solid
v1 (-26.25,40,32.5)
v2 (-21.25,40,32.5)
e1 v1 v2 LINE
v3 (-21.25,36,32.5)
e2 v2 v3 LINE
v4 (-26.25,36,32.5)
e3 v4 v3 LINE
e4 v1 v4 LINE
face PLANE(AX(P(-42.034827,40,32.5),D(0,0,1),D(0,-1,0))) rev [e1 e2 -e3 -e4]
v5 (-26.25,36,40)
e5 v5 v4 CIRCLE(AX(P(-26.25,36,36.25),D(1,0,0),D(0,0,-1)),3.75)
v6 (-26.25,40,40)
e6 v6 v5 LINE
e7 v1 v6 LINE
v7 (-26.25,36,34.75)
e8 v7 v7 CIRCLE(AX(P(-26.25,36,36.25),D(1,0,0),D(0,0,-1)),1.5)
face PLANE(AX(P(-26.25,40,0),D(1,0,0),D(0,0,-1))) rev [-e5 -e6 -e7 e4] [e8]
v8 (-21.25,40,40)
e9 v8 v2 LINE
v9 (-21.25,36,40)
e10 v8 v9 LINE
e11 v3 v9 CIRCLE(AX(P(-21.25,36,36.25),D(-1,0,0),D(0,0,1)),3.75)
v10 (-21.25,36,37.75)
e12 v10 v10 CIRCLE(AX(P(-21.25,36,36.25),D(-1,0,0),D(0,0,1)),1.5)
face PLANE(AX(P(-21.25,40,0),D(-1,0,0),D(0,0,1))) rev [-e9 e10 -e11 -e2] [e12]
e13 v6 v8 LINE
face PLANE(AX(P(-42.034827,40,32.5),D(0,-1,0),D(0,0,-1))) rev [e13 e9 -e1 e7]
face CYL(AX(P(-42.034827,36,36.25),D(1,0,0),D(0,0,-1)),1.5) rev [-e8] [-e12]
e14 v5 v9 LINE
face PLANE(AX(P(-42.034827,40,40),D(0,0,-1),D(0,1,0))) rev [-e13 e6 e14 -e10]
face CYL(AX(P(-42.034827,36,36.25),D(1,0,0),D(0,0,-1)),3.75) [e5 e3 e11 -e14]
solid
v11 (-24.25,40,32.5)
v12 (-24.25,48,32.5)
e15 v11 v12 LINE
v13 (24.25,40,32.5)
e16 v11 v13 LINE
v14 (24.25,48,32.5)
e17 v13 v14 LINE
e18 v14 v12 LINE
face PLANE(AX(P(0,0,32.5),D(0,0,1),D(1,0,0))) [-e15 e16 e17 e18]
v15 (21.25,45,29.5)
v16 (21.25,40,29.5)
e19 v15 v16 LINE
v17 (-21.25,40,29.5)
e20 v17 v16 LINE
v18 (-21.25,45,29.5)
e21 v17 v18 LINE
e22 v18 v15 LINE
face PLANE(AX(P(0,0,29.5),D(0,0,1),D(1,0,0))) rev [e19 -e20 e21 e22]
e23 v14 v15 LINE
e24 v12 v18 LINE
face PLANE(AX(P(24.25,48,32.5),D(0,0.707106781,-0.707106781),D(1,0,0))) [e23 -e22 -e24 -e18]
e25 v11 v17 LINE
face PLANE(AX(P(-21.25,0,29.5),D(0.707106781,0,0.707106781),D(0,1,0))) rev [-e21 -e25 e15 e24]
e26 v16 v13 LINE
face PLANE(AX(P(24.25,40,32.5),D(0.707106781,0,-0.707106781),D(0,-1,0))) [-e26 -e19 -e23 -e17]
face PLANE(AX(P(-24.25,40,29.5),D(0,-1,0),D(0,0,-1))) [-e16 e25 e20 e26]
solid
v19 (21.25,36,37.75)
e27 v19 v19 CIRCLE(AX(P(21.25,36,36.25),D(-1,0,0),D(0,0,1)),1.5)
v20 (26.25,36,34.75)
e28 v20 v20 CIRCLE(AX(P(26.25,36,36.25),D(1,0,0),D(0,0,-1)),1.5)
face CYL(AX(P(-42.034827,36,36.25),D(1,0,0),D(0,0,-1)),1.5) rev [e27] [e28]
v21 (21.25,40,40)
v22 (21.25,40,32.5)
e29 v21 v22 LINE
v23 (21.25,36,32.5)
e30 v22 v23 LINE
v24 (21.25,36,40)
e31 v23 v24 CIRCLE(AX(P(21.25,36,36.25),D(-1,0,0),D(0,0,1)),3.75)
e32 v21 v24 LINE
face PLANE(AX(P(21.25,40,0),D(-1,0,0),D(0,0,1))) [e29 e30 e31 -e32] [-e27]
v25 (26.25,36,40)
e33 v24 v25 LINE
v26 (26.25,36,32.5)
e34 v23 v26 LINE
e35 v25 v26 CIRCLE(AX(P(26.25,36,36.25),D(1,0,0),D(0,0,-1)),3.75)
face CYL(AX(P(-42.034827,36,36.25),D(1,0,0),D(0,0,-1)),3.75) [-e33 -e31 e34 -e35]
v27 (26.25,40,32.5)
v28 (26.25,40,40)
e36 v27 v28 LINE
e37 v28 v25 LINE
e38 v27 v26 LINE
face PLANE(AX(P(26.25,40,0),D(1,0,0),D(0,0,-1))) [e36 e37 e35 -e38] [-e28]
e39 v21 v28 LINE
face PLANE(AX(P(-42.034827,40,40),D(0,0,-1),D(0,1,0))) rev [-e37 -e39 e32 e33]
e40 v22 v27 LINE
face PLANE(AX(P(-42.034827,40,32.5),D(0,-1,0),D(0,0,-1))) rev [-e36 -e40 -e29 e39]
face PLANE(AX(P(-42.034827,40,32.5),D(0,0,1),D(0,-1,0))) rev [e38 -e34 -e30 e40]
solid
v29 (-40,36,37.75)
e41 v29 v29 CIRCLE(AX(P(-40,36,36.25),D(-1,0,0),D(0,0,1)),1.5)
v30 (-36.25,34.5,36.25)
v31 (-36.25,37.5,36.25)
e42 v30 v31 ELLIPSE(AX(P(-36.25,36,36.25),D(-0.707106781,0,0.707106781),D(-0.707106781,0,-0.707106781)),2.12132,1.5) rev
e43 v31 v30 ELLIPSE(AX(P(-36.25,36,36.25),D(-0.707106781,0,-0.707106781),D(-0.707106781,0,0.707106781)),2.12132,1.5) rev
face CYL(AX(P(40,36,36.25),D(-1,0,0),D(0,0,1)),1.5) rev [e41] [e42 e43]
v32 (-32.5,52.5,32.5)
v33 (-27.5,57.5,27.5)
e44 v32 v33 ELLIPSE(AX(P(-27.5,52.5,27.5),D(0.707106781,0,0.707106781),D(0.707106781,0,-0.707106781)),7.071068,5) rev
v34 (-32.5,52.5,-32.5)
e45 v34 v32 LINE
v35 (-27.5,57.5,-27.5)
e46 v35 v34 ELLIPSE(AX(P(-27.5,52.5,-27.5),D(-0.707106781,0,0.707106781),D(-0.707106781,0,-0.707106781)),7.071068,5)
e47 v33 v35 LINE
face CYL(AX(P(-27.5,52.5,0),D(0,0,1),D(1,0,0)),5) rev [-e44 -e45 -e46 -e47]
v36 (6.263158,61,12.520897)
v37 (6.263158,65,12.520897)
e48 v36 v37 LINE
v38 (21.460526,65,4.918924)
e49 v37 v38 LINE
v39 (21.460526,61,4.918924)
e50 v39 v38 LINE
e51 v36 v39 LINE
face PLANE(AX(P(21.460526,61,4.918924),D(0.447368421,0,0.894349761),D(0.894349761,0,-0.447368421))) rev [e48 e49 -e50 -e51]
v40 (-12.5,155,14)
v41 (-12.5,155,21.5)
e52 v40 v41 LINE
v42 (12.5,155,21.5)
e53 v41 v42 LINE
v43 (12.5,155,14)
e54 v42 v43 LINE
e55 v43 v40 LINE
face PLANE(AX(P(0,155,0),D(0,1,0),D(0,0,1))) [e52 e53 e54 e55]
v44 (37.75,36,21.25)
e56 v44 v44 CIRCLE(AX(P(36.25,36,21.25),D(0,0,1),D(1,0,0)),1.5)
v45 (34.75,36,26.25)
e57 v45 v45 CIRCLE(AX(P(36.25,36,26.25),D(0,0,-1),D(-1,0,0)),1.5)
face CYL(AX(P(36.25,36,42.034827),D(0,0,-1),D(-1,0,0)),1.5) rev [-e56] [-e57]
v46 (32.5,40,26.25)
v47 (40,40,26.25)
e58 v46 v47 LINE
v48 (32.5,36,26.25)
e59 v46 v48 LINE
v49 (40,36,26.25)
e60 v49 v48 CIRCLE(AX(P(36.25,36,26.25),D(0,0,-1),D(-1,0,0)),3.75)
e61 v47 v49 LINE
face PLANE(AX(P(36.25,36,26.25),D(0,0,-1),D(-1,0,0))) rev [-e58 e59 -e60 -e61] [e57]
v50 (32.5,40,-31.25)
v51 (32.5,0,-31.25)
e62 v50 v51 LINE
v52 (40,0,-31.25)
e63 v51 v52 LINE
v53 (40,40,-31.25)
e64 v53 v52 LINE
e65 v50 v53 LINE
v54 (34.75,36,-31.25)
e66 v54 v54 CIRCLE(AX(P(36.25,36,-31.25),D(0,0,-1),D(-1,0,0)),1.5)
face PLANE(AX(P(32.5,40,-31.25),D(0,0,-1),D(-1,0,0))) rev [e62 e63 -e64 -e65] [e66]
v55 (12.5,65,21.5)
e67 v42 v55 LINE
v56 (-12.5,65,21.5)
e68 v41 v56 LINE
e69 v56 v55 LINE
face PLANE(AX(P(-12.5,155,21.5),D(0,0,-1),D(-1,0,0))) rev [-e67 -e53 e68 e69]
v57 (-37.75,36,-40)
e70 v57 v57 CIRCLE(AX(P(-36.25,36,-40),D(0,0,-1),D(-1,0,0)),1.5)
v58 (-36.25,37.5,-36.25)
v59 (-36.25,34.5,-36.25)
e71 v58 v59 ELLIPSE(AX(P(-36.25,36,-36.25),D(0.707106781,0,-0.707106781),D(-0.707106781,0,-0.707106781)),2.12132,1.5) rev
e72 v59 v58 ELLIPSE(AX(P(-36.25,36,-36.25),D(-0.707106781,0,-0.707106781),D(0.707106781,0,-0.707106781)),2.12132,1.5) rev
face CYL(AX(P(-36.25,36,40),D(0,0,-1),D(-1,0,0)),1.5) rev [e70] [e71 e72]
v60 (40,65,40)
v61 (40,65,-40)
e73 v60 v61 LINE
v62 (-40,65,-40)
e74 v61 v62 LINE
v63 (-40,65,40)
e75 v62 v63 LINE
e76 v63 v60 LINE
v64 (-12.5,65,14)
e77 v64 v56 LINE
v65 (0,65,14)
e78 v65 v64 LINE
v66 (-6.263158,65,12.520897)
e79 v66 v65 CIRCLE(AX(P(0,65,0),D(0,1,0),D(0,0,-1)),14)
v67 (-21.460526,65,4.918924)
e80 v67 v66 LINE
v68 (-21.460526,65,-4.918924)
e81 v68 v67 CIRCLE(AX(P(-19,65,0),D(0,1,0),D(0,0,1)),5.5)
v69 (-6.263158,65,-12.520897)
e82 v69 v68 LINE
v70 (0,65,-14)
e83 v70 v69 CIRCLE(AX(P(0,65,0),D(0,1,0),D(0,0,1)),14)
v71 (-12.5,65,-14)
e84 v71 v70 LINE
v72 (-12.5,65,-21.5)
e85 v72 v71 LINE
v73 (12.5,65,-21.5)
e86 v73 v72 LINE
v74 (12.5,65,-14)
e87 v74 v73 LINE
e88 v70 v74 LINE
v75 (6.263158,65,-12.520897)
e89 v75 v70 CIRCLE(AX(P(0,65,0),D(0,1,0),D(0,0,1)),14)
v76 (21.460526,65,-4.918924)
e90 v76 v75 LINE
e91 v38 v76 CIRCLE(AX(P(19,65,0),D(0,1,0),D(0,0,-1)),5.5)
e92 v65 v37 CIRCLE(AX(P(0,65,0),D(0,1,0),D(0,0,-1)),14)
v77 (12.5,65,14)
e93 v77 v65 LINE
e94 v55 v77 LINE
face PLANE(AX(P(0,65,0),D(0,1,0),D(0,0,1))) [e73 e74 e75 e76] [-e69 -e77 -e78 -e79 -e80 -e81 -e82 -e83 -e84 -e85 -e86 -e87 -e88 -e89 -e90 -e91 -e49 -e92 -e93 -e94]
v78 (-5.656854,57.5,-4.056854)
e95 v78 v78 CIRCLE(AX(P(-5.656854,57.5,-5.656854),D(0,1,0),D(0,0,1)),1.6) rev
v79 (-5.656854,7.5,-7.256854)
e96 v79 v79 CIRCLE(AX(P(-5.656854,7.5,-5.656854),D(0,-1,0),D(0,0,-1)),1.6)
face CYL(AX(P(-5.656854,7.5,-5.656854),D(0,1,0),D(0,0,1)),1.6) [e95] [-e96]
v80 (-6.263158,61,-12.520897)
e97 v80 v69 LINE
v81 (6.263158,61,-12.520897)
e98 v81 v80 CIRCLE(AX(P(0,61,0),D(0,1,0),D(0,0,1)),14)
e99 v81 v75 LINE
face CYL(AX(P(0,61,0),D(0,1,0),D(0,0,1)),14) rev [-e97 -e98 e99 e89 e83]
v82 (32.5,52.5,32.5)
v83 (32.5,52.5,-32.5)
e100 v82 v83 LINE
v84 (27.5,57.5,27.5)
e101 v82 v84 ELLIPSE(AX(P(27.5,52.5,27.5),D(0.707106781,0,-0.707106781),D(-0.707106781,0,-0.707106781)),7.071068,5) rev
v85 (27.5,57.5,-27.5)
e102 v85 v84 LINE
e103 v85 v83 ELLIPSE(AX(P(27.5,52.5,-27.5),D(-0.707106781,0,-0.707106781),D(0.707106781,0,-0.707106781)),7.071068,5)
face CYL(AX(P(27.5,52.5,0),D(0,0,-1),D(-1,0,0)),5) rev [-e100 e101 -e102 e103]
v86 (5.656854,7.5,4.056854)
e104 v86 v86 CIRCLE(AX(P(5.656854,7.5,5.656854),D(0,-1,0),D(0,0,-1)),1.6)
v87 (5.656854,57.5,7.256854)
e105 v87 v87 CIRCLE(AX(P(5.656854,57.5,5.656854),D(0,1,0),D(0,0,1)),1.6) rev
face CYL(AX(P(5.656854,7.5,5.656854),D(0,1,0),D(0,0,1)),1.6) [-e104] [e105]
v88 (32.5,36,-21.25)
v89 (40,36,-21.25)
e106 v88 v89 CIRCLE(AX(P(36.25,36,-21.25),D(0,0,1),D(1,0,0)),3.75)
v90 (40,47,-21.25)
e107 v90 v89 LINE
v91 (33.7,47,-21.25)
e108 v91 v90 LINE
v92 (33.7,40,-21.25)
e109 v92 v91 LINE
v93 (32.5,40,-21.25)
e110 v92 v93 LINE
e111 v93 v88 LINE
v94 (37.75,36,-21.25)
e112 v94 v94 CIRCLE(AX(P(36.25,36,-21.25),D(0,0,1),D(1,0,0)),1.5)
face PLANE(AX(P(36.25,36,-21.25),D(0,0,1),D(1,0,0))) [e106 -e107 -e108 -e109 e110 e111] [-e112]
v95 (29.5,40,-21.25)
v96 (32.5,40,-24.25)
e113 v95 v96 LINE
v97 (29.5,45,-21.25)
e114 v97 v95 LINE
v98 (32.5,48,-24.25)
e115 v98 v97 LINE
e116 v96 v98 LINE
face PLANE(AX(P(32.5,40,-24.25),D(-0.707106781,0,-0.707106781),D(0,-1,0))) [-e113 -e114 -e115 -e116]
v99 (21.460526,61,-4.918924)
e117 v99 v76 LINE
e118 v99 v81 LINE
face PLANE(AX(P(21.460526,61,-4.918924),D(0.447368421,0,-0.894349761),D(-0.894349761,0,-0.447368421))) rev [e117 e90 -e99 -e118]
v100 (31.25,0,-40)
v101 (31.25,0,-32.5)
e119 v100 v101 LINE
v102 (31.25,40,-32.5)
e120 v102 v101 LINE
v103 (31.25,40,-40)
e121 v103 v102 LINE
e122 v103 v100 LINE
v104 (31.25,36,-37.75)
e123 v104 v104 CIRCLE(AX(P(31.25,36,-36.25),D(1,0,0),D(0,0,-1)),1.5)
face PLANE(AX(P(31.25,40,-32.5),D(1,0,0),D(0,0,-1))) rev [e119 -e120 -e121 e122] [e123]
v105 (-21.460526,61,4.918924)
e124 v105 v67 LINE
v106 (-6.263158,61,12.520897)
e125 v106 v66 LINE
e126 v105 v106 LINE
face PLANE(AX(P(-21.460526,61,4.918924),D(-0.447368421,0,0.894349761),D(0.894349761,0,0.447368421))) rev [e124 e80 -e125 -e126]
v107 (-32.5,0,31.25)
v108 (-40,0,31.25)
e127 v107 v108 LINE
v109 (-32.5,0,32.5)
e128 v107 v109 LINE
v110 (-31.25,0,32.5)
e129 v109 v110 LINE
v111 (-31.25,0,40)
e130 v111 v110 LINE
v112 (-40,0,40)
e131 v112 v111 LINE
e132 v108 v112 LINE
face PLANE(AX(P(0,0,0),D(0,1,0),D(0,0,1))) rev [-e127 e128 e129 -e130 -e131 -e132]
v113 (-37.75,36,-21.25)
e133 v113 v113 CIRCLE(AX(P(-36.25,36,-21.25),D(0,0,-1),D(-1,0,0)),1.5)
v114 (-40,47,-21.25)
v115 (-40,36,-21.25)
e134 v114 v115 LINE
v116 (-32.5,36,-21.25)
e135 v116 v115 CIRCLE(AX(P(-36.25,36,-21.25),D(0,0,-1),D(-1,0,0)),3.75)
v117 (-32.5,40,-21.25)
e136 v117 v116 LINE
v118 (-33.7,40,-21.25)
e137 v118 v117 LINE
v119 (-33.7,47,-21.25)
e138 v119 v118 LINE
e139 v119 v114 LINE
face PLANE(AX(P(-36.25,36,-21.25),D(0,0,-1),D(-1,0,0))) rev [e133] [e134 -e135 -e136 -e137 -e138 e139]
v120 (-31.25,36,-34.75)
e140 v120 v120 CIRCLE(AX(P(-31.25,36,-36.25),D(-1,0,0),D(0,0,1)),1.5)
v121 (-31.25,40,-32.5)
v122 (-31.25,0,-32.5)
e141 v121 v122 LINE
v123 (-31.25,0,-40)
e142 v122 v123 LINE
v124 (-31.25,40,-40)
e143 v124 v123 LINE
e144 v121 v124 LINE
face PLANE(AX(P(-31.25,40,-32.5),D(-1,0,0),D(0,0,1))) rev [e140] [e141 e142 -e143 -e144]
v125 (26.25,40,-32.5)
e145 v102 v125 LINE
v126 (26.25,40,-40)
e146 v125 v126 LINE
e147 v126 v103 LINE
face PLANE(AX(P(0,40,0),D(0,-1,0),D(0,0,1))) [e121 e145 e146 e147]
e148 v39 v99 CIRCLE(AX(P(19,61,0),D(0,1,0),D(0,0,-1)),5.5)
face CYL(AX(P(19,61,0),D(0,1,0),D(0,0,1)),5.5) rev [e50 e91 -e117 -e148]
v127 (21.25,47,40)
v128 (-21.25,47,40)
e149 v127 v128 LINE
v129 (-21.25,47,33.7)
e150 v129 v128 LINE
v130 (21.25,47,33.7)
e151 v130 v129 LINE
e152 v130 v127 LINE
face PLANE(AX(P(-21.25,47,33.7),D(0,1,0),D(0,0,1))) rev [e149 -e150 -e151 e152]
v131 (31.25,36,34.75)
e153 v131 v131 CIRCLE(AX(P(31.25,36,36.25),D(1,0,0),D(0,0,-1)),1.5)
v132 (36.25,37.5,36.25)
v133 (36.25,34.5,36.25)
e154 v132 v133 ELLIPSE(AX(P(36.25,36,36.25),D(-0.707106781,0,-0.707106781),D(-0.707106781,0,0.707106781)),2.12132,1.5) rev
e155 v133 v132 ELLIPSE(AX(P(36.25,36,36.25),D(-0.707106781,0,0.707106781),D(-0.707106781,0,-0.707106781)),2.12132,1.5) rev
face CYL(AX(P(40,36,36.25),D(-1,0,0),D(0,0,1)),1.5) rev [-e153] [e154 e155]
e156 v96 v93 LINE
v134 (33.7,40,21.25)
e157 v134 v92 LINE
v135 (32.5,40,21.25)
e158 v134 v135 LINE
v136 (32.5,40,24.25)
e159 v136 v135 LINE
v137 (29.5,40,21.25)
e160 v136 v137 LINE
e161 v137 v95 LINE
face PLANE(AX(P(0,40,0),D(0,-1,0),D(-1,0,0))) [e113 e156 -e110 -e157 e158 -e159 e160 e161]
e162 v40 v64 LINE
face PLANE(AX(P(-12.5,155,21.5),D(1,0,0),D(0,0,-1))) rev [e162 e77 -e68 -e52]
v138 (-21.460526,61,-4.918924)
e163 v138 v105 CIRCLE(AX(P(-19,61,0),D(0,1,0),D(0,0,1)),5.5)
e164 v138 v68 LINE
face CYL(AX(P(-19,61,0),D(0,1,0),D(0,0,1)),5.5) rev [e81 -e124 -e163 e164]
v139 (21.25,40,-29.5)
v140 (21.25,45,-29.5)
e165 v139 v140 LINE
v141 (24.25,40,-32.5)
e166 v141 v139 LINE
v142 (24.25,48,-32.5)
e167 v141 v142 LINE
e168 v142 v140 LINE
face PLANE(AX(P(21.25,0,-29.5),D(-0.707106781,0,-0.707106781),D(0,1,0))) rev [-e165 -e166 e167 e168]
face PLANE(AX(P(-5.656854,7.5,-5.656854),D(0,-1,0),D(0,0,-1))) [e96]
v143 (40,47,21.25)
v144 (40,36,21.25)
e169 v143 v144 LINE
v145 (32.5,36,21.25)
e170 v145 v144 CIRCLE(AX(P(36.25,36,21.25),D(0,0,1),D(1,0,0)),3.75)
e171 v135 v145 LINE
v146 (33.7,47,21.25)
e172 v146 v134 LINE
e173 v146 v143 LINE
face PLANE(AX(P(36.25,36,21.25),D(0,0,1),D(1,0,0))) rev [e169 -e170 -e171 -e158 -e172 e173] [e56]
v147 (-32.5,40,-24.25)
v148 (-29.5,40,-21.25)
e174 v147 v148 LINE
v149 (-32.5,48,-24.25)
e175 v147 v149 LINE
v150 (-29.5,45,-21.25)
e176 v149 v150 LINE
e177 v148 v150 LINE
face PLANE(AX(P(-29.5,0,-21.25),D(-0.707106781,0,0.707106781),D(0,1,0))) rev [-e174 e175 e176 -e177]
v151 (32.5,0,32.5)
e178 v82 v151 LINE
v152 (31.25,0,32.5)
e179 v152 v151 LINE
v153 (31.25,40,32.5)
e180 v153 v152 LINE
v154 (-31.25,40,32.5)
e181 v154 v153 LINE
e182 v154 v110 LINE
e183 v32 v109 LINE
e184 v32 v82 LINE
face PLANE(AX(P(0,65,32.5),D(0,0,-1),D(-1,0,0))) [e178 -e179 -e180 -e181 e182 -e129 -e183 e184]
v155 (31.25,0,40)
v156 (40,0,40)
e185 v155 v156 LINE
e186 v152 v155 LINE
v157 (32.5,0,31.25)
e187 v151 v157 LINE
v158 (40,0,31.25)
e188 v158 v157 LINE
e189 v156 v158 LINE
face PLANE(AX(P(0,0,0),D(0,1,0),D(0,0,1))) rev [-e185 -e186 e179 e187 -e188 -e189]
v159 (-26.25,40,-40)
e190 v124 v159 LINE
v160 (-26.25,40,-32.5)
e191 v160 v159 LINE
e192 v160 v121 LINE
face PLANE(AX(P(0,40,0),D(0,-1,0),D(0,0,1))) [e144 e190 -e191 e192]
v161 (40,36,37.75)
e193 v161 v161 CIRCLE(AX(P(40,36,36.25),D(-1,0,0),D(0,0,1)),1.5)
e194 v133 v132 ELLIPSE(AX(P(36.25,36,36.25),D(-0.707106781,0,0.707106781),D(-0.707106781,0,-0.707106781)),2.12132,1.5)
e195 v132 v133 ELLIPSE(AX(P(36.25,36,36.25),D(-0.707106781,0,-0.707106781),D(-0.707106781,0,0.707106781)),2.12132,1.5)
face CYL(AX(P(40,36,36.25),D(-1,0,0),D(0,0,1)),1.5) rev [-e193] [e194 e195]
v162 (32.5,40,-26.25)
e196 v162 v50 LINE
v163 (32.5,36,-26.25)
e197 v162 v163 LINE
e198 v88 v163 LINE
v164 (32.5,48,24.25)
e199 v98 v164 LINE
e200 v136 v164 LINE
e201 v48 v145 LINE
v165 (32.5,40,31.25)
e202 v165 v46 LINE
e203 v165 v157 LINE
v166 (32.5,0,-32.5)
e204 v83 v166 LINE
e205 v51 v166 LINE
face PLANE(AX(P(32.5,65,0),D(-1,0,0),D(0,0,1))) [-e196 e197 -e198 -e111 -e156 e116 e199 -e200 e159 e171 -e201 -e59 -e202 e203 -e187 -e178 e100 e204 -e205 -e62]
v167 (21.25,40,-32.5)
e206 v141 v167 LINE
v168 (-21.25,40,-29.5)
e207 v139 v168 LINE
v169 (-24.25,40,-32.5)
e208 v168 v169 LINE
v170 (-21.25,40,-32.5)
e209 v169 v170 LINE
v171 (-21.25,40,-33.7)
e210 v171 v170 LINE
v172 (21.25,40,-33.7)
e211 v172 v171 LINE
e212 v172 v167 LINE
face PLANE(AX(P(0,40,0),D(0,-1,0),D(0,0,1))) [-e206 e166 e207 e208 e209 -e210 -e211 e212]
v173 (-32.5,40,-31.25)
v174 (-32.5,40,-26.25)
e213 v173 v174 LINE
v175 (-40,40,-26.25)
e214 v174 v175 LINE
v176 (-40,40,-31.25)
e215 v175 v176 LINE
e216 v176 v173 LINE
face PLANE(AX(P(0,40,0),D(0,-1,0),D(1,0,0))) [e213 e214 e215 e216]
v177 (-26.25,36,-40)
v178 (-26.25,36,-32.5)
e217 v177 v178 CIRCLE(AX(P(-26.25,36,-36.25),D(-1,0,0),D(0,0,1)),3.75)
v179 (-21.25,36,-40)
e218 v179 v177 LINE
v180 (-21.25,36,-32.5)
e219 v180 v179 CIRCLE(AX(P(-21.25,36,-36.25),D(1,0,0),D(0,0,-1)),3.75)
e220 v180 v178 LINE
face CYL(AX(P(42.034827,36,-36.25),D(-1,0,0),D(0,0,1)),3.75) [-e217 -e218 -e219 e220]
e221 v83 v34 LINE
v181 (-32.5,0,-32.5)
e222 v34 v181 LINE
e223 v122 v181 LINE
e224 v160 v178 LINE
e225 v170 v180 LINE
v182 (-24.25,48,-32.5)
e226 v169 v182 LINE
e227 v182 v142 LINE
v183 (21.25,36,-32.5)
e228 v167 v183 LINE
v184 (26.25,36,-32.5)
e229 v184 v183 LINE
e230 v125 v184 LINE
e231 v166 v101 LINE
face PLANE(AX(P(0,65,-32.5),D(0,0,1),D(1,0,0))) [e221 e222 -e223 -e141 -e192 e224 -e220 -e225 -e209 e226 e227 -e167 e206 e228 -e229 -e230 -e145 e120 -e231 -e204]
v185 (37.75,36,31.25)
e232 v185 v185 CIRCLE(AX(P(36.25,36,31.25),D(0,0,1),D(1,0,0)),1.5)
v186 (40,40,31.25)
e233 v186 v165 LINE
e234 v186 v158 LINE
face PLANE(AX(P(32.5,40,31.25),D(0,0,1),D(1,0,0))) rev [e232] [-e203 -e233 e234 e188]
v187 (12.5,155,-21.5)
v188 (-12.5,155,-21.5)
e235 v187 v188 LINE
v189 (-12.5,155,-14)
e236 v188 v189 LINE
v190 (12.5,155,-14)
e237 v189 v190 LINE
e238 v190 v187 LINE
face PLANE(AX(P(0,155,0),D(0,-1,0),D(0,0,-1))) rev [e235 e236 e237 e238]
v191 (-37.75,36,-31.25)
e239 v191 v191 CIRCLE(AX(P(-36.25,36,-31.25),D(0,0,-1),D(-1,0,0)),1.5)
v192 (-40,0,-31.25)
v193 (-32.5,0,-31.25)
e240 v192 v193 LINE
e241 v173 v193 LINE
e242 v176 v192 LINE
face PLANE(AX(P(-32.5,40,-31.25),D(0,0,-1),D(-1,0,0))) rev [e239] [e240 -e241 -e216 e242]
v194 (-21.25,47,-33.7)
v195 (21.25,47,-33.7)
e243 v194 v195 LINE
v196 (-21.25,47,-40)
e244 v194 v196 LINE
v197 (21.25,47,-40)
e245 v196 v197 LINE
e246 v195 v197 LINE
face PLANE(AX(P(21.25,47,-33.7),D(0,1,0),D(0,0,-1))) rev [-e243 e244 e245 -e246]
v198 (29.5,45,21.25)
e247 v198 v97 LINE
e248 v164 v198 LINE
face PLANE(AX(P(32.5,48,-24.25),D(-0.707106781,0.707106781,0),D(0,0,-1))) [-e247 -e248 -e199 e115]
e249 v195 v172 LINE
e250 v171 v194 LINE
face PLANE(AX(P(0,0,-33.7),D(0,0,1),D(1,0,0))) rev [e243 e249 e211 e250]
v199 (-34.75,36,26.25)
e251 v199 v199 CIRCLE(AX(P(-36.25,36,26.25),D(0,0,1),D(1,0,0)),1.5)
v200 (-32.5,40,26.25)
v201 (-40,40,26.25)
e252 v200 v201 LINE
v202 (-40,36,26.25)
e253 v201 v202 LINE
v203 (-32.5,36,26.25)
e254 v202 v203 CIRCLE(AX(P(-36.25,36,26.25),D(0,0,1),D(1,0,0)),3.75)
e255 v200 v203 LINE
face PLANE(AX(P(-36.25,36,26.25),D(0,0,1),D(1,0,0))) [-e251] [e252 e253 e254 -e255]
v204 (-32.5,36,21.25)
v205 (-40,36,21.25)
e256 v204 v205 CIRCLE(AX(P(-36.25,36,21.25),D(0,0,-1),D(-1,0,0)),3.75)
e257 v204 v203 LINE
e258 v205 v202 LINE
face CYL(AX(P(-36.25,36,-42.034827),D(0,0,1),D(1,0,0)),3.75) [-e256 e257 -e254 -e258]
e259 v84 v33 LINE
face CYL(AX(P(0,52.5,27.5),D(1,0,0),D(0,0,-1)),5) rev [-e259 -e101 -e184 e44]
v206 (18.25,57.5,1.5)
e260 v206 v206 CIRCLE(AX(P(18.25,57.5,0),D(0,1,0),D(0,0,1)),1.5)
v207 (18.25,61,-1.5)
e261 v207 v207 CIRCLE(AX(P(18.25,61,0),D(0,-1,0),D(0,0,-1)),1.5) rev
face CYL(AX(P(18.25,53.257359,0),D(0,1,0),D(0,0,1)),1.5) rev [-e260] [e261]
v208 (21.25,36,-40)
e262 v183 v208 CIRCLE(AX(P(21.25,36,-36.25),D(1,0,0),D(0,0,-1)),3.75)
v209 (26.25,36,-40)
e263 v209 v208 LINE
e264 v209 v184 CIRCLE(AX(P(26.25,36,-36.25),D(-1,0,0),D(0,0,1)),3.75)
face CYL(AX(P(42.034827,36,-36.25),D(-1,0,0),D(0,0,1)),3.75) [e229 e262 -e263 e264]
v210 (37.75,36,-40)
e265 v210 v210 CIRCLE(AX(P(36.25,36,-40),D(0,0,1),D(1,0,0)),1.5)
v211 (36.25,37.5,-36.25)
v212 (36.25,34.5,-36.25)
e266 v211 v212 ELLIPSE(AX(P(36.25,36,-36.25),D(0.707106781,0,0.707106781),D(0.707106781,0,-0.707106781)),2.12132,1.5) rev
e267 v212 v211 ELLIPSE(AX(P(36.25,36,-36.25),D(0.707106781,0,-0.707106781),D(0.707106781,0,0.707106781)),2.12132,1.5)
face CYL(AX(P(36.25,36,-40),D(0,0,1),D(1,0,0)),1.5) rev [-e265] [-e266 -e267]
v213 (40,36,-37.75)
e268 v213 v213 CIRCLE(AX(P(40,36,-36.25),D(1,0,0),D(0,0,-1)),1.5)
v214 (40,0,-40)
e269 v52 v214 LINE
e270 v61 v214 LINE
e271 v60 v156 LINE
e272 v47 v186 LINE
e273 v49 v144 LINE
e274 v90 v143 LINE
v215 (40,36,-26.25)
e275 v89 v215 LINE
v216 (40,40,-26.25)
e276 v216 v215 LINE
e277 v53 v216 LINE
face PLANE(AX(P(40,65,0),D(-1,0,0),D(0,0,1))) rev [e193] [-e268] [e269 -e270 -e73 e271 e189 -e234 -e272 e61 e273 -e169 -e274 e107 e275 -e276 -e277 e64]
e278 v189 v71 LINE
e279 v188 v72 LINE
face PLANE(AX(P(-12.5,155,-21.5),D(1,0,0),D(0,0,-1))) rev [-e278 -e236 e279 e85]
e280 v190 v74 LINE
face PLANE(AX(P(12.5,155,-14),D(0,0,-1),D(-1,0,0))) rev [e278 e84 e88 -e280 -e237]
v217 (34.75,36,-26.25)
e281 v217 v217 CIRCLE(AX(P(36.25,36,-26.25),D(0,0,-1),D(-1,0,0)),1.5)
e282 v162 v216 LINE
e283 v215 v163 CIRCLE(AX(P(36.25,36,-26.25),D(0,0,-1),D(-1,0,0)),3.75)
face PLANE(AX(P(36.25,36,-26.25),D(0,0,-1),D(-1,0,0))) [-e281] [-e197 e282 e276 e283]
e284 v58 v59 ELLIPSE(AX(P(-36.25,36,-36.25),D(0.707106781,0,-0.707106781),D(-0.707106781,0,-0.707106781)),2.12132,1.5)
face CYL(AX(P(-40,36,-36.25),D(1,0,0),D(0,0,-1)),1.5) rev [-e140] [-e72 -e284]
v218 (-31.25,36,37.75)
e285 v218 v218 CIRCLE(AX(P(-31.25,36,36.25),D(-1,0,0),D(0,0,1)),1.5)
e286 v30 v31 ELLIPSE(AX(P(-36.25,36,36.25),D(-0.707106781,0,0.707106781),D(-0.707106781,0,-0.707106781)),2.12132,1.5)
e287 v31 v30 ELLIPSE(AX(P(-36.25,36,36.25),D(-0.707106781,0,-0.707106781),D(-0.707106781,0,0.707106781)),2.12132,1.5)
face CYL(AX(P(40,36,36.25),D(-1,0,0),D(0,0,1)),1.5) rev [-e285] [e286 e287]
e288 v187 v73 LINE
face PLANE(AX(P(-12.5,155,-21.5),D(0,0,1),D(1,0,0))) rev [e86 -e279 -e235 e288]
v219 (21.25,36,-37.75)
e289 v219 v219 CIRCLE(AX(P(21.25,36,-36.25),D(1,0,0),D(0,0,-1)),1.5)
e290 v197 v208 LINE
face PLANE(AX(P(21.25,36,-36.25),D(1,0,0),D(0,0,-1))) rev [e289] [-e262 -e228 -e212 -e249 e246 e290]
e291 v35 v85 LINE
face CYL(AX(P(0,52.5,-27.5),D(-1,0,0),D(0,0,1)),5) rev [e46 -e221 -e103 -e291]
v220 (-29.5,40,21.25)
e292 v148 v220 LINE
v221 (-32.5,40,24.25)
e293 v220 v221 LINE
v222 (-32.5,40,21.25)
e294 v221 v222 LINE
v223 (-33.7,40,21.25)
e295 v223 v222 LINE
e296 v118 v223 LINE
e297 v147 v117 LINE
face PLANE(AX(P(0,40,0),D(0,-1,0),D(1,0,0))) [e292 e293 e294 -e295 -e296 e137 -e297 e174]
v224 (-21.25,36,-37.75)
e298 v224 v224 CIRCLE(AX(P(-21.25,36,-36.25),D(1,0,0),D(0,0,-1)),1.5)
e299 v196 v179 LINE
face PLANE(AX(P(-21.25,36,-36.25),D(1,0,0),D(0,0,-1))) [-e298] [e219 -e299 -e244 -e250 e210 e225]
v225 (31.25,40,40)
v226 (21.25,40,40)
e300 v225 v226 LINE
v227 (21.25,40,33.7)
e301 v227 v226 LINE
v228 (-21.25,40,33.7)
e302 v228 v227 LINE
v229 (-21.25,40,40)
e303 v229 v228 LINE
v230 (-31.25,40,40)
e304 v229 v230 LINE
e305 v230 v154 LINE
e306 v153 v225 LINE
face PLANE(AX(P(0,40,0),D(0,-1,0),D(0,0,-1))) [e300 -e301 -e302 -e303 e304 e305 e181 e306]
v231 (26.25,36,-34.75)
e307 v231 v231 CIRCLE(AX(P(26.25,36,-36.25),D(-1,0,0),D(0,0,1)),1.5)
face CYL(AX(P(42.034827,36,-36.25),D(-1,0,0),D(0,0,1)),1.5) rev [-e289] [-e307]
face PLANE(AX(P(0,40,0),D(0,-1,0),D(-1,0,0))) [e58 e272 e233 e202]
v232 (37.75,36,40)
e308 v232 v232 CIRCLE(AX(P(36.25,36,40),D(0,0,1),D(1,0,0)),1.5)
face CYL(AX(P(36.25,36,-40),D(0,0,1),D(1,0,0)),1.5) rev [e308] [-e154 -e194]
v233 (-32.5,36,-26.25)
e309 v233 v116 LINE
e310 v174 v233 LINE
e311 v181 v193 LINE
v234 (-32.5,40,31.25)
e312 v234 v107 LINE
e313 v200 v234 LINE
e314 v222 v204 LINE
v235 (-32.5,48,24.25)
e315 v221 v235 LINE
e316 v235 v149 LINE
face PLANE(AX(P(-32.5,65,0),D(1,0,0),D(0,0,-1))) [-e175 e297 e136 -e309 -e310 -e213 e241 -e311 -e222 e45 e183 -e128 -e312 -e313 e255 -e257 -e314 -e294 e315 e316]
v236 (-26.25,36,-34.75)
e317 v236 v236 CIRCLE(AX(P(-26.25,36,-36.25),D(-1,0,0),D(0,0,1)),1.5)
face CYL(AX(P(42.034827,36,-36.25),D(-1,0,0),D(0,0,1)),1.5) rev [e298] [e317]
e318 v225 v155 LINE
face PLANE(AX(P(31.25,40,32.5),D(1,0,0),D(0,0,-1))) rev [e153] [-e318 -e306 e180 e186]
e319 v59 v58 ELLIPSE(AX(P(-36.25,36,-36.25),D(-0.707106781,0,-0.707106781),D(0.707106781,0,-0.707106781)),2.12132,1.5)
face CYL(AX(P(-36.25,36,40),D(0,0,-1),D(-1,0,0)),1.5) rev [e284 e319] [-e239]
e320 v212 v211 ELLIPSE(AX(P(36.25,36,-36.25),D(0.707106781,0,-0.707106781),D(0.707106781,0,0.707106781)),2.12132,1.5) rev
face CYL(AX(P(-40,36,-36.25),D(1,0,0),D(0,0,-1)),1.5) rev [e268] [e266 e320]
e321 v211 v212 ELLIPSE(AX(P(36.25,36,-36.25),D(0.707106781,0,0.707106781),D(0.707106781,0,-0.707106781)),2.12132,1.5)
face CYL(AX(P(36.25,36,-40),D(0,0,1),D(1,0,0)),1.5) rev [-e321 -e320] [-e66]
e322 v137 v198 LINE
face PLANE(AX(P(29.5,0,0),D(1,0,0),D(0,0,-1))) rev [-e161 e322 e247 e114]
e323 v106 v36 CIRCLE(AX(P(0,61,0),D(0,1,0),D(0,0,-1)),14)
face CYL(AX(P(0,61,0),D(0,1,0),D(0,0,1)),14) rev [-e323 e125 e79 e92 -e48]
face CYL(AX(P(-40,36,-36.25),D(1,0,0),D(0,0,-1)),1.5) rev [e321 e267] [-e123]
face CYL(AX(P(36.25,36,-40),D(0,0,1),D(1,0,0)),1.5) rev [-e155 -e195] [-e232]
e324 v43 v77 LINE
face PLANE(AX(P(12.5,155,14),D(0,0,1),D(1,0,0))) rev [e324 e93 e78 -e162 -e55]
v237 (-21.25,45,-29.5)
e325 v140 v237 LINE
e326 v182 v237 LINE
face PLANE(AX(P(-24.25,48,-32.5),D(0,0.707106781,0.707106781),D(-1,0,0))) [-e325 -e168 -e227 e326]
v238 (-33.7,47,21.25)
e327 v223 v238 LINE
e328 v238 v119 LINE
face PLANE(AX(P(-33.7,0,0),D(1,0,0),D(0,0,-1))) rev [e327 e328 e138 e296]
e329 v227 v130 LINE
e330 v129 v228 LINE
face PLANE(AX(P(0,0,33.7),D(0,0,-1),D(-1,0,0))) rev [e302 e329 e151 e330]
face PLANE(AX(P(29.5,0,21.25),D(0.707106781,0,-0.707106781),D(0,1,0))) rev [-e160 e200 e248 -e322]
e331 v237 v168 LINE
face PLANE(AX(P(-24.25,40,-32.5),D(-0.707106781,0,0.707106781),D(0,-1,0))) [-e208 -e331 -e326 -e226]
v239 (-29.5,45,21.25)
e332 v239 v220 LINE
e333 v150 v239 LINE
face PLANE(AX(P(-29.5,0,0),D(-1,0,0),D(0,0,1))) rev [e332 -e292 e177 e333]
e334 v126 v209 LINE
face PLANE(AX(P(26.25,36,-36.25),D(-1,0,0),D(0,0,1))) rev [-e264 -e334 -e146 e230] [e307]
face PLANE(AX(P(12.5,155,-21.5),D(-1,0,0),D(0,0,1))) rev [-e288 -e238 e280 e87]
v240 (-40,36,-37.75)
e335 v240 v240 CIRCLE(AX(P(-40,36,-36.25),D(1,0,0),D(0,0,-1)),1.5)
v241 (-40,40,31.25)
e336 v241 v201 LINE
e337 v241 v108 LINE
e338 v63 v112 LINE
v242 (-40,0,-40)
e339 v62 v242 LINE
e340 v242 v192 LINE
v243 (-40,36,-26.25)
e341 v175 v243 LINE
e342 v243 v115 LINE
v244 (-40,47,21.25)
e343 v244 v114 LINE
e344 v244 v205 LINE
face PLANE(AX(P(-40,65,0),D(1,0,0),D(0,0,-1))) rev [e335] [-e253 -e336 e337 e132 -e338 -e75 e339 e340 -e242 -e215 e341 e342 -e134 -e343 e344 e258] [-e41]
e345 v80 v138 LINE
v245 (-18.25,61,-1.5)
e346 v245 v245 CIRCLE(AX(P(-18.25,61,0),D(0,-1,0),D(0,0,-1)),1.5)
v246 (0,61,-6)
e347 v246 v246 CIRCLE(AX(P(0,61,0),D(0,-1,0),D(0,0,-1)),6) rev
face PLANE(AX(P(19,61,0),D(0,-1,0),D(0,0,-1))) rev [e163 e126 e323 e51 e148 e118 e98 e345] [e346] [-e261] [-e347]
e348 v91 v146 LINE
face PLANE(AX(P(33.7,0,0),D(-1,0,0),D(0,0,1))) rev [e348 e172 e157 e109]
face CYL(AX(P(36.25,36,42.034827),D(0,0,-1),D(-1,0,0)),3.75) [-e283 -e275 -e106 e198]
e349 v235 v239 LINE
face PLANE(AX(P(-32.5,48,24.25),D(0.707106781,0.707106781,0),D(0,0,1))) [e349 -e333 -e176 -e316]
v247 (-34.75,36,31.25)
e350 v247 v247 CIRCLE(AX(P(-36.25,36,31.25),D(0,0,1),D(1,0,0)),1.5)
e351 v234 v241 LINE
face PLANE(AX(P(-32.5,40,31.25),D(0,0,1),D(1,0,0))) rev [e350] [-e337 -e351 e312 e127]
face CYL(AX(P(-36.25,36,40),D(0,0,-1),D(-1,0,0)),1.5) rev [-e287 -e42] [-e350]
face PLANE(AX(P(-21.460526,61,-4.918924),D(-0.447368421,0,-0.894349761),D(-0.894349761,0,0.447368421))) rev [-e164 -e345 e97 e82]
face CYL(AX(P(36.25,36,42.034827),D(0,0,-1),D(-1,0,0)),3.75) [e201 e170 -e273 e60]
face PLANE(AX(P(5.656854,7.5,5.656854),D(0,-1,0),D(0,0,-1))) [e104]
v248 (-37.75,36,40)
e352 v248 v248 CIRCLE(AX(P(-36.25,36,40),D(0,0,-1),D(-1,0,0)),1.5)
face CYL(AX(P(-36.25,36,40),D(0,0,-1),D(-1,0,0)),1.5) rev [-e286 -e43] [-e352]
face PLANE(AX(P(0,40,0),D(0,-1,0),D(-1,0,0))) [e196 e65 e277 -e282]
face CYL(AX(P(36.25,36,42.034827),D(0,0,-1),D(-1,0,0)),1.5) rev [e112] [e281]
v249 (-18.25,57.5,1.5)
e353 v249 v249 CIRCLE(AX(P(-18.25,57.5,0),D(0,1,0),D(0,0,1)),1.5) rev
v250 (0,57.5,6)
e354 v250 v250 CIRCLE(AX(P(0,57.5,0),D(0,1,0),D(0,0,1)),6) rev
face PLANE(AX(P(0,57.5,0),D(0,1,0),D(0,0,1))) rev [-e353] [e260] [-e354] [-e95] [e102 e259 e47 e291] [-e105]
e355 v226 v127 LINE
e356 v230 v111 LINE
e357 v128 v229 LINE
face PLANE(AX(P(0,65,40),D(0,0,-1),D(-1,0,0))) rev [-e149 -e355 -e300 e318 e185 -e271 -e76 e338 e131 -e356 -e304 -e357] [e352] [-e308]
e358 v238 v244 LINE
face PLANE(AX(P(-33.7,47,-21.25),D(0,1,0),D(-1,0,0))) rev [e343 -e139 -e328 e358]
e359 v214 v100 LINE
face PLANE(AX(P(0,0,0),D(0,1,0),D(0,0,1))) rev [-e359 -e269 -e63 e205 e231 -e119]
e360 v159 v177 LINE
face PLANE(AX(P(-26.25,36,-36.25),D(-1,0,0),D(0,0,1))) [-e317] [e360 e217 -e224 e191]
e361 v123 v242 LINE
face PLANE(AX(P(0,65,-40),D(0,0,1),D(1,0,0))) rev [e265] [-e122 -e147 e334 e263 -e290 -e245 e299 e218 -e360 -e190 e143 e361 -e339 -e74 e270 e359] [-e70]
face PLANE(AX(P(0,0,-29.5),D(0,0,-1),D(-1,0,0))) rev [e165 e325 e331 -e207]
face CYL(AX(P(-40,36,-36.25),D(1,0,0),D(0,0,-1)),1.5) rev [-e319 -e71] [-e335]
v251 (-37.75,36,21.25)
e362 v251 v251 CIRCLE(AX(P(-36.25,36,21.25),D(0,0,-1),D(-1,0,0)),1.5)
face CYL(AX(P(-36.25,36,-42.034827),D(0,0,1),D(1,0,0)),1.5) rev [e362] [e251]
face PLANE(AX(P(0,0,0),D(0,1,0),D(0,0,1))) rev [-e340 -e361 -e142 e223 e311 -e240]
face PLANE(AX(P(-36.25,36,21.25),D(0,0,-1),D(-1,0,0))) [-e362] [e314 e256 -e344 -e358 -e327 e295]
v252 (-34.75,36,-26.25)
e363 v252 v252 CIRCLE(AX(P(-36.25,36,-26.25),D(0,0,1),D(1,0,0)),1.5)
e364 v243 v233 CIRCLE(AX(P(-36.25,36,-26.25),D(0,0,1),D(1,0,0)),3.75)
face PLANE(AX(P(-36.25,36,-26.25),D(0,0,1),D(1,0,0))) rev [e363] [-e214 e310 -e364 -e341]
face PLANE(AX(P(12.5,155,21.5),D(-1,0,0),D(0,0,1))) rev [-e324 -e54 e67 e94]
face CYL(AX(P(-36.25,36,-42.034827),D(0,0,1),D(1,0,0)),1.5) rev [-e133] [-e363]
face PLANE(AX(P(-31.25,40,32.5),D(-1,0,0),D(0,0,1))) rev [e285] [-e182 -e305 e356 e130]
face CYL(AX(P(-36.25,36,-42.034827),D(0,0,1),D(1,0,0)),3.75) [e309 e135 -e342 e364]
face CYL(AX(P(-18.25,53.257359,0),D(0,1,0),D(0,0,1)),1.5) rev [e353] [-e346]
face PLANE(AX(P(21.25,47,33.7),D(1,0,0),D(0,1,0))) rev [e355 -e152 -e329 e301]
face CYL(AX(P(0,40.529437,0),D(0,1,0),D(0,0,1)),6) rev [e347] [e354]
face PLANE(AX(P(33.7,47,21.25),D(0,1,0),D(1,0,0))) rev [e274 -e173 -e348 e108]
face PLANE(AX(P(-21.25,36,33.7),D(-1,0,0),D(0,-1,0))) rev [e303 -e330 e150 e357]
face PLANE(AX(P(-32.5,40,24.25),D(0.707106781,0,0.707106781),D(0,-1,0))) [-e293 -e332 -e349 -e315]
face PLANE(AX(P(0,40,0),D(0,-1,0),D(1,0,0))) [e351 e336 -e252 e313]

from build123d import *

# Parameters (mm, degrees)
MAIN_EXTRUDE_DEPTH                            = 65
SHELL2_T                                      = -7.5
SHELL_CORNER_FILLET_R                         = 5
SKETCH14_R                                    = 6
TOP_HOLE_DEPTH                                = 7.5
SKETCH24_W                                    = 62.5
SKETCH24_H                                    = 7.5
MAIN_DOOR_DEPTH                               = 40
SKETCH40_R                                    = 1.6
BOLT_GUIDE_DEPTH                              = 50
SKETCH35_R                                    = 1.5
DOOR_ROUNDING_DEPTH                           = 62.5
SKETCH35_3_R                                  = 1.5
DOOR_SCREW_DEPTH                              = 105.410547839
SKETCH39_W                                    = 21.25
SKETCH39_H                                    = 7.5
SKETCH39_W_2                                  = 5
DOOR_TEETH_DEPTH                              = 7.75
SKETCH41_R                                    = 1.5
LEAD_HOLDER_PLACE_DEPTH                       = 4
SKETCH41_2_R                                  = 1.5
LEAD_HOLDER_HOLES_DEPTH                       = 7.5
SKETCH43_W                                    = 25
SKETCH43_H                                    = 7.5
MOTOR_TOWERS_DEPTH                            = 90
SKETCH45_W                                    = 48.5
SKETCH45_H                                    = 8
SPRING_BACK_SUPPORT_DEPTH                     = 3
SPRING_BACK_SUPPORT_SUPPORT_SIZE              = 3
SKETCH47_W                                    = 42.5
SKETCH47_H                                    = 11
SPRING_PLACE_DEPTH                            = 6.3
DOOR_PTR_COUNT                                = 4
DOOR_ROUNDING_PTR_START                       = -26.25
DOOR_ROUNDING_PTR_OUTLINE_R                   = 1.5
DOOR_ROUNDING_PTR_DEPTH                       = 5
DOOR_ROUNDING_PTR_START_2                     = 21.25
DOOR_ROUNDING_PTR_2_OUTLINE_R                 = 1.5
DOOR_ROUNDING_PTR_2_DEPTH                     = 5
DOOR_ROUNDING_PTR_3_OUTLINE_R                 = 1.5
DOOR_ROUNDING_PTR_3_DEPTH                     = 5
DOOR_ROUNDING_PTR_4_OUTLINE_R                 = 1.5
DOOR_ROUNDING_PTR_4_DEPTH                     = 5
DOOR_SCREW_PTR_COUNT                          = 4
SPRING_PLACING_PTR_COUNT                      = 4
SPRING_BACK_SUPPORT_SUPPORT_OF_SPRING_PL_SIZE = 3


# Read off the part's stored shape, not the designer's step: door-rounding-ptr
with BuildPart() as part:
    # Sketch11 → main-extrude (new body)
    with BuildSketch(Plane(origin=(0, 0, 0), x_dir=(1, 0, 0), z_dir=(0, 1, 0))):
        Polygon((40, -40), (40, 0), (40, 40), (0, 40), (-40, 40), (-40, 0), (-40, -40), (0, -40), align=None)
    extrude(amount=MAIN_EXTRUDE_DEPTH)

    # Shell2
    shell2_openings = [part.faces().sort_by_distance(p)[0] for p in [
        (0, 0, 0),
    ]]
    offset(amount=SHELL2_T, openings=shell2_openings, kind=Kind.INTERSECTION)

    # shell-corner-fillet
    shell_corner_fillet_edges = [part.edges().sort_by_distance(p)[0] for p in [
        (0, 57.5, -32.5),
        (-32.5, 57.5, 0),
        (0, 57.5, 32.5),
        (32.5, 57.5, 0),
    ]]
    fillet(shell_corner_fillet_edges, radius=SHELL_CORNER_FILLET_R)

    # Sketch14 → top-hole (cut)
    with BuildSketch(Plane(origin=(0, 65, 0), x_dir=(1, 0, 0), z_dir=(0, 1, 0))):
        with Locations(Location((0, 0, 0), (0, 0, 270))):
            Circle(SKETCH14_R)
    extrude(amount=-TOP_HOLE_DEPTH, mode=Mode.SUBTRACT)

    # Sketch24 → main-door (cut)
    with BuildSketch(Plane.XZ):
        with Locations((0, 36.25)):
            Rectangle(SKETCH24_W, SKETCH24_H)
    main_door = extrude(amount=-MAIN_DOOR_DEPTH, mode=Mode.SUBTRACT)

    # Sketch40 → bolt-guide (add)
    with BuildSketch(Plane.XZ.offset(-57.5)):
        with Locations(Location((-5.656854249, -5.656854249, 0), (0, 0, 90))):
            Circle(SKETCH40_R)
        with Locations(Location((5.656854249, 5.656854249, 0), (0, 0, 90))):
            Circle(SKETCH40_R)
    extrude(amount=BOLT_GUIDE_DEPTH)

    # Sketch35<3> → door-screw (cut, symmetric)
    with BuildSketch(Plane.ZY.offset(-31.25)):
        with Locations((36.25, 36)):
            Circle(SKETCH35_3_R)
    door_screw = extrude(amount=DOOR_SCREW_DEPTH, both=True, mode=Mode.SUBTRACT)

    # Sketch41 → lead-holder-place (cut)
    with BuildSketch(Plane(origin=(0, 65, 0), x_dir=(1, 0, 0), z_dir=(0, 1, 0))):
        with BuildLine():
            Line((-21.460526316, 4.918923688), (-6.263157895, 12.520896661))
            ThreePointArc((-6.263157895, 12.520896661), (0, 14), (6.263157895, 12.520896661))
            Line((6.263157895, 12.520896661), (21.460526316, 4.918923688))
            ThreePointArc((21.460526316, 4.918923688), (24.5, 0), (21.460526316, -4.918923688))
            Line((21.460526316, -4.918923688), (6.263157895, -12.520896661))
            ThreePointArc((6.263157895, -12.520896661), (0, -14), (-6.263157895, -12.520896661))
            Line((-6.263157895, -12.520896661), (-21.460526316, -4.918923688))
            ThreePointArc((-21.460526316, -4.918923688), (-24.5, 0), (-21.460526316, 4.918923688))
        make_face()
        with Locations(Location((-18.25, 0, 0), (0, 0, 270))):
            Circle(SKETCH41_R, mode=Mode.SUBTRACT)
        with Locations(Location((18.25, 0, 0), (0, 0, 90))):
            Circle(SKETCH41_R, mode=Mode.SUBTRACT)
    extrude(amount=-LEAD_HOLDER_PLACE_DEPTH, mode=Mode.SUBTRACT)

    # Sketch41<2> → lead-holder-holes (cut)
    with BuildSketch(Plane(origin=(0, 65, 0), x_dir=(1, 0, 0), z_dir=(0, 1, 0))):
        with Locations(Location((-18.25, 0, 0), (0, 0, 270))):
            Circle(SKETCH41_2_R)
        with Locations(Location((18.25, 0, 0), (0, 0, 270))):
            Circle(SKETCH41_2_R)
    extrude(amount=-LEAD_HOLDER_HOLES_DEPTH, mode=Mode.SUBTRACT)

    # Sketch43 → motor-towers (add)
    with BuildSketch(Plane(origin=(0, 65, 0), x_dir=(1, 0, 0), z_dir=(0, 1, 0))):
        with Locations((0, 17.75)):
            Rectangle(SKETCH43_W, SKETCH43_H)
        with Locations((0, -17.75)):
            Rectangle(SKETCH43_W, SKETCH43_H)
    extrude(amount=MOTOR_TOWERS_DEPTH)

    # Sketch47 → spring-place (cut)
    with BuildSketch(Plane.XY.offset(40)):
        with Locations((0, 41.5)):
            Rectangle(SKETCH47_W, SKETCH47_H)
    spring_place = extrude(amount=-SPRING_PLACE_DEPTH, mode=Mode.SUBTRACT)

    # door-ptr: main-door ×4 about axis
    door_ptr_axis = Axis((0, 0, 0), (0, 1, 0))
    for i in range(1, DOOR_PTR_COUNT):
        add(main_door.rotate(door_ptr_axis, i * 360 / DOOR_PTR_COUNT), mode=Mode.SUBTRACT)

    # door-rounding-ptr outline → door-rounding-ptr (add)
    with BuildSketch(Plane.YZ.offset(DOOR_ROUNDING_PTR_START)):
        with BuildLine():
            ThreePointArc((36, -32.5), (32.25, -36.25), (36, -40))
            Line((36, -40), (40, -40))
            Line((40, -40), (40, -32.5))
            Line((40, -32.5), (36, -32.5))
        make_face()
        with Locations((36, -36.25)):
            Circle(DOOR_ROUNDING_PTR_OUTLINE_R, mode=Mode.SUBTRACT)
    extrude(amount=DOOR_ROUNDING_PTR_DEPTH)

    # door-rounding-ptr 2 outline → door-rounding-ptr 2 (add)
    with BuildSketch(Plane.YZ.offset(DOOR_ROUNDING_PTR_START_2)):
        with BuildLine():
            ThreePointArc((36, -32.5), (32.25, -36.25), (36, -40))
            Line((36, -40), (40, -40))
            Line((40, -40), (40, -32.5))
            Line((40, -32.5), (36, -32.5))
        make_face()
        with Locations((36, -36.25)):
            Circle(DOOR_ROUNDING_PTR_2_OUTLINE_R, mode=Mode.SUBTRACT)
    extrude(amount=DOOR_ROUNDING_PTR_2_DEPTH)

    # door-rounding-ptr 3 outline → door-rounding-ptr 3 (add)
    # profile 1 of 2: a face of its own
    with BuildSketch(Plane.XY.offset(DOOR_ROUNDING_PTR_START)):
        with BuildLine():
            Line((-40, 40), (-40, 36))
            ThreePointArc((-40, 36), (-36.25, 32.25), (-32.5, 36))
            Line((-32.5, 36), (-32.5, 40))
            Line((-32.5, 40), (-40, 40))
        make_face()
        with Locations((-36.25, 36)):
            Circle(DOOR_ROUNDING_PTR_3_OUTLINE_R, mode=Mode.SUBTRACT)
    # profile 2 of 2: a face of its own
    with BuildSketch(Plane.XY.offset(DOOR_ROUNDING_PTR_START)):
        with BuildLine():
            ThreePointArc((32.5, 36), (36.25, 32.25), (40, 36))
            Line((40, 36), (40, 40))
            Line((40, 40), (32.5, 40))
            Line((32.5, 40), (32.5, 36))
        make_face()
        with Locations((36.25, 36)):
            Circle(DOOR_ROUNDING_PTR_3_OUTLINE_R, mode=Mode.SUBTRACT)
    extrude(amount=DOOR_ROUNDING_PTR_3_DEPTH)

    # door-rounding-ptr 4 outline → door-rounding-ptr 4 (add)
    # profile 1 of 2: a face of its own
    with BuildSketch(Plane.XY.offset(DOOR_ROUNDING_PTR_START_2)):
        with BuildLine():
            Line((-40, 40), (-40, 36))
            ThreePointArc((-40, 36), (-36.25, 32.25), (-32.5, 36))
            Line((-32.5, 36), (-32.5, 40))
            Line((-32.5, 40), (-40, 40))
        make_face()
        with Locations((-36.25, 36)):
            Circle(DOOR_ROUNDING_PTR_4_OUTLINE_R, mode=Mode.SUBTRACT)
    # profile 2 of 2: a face of its own
    with BuildSketch(Plane.XY.offset(DOOR_ROUNDING_PTR_START_2)):
        with BuildLine():
            ThreePointArc((32.5, 36), (36.25, 32.25), (40, 36))
            Line((40, 36), (40, 40))
            Line((40, 40), (32.5, 40))
            Line((32.5, 40), (32.5, 36))
        make_face()
        with Locations((36.25, 36)):
            Circle(DOOR_ROUNDING_PTR_4_OUTLINE_R, mode=Mode.SUBTRACT)
    extrude(amount=DOOR_ROUNDING_PTR_4_DEPTH)

    # door-screw-ptr: door-screw ×4 about axis
    door_screw_ptr_axis = Axis((0, 0, 0), (0, 1, 0))
    for i in range(1, DOOR_SCREW_PTR_COUNT):
        add(door_screw.rotate(door_screw_ptr_axis, i * 360 / DOOR_SCREW_PTR_COUNT), mode=Mode.SUBTRACT)


with BuildPart() as body_2:
    # Sketch35 → door-rounding (new body)
    with BuildSketch(Plane.ZY.offset(-31.25)):
        with BuildLine():
            Line((32.5, 40), (32.5, 36))
            ThreePointArc((32.5, 36), (36.25, 32.25), (40, 36))
            Line((40, 36), (40, 40))
            Line((40, 40), (32.5, 40))
        make_face()
        with Locations((36.25, 36)):
            Circle(SKETCH35_R, mode=Mode.SUBTRACT)
    extrude(amount=DOOR_ROUNDING_DEPTH)

    # Sketch39 → door-teeth (cut)
    with BuildSketch(Plane.XZ.offset(-32.25)):
        with Locations((10.625, 36.25)):
            Rectangle(SKETCH39_W, SKETCH39_H)
        with Locations((-10.625, 36.25)):
            Rectangle(SKETCH39_W, SKETCH39_H)
        with Locations((28.75, 36.25)):
            Rectangle(SKETCH39_W_2, SKETCH39_H)
        with Locations((-28.75, 36.25)):
            Rectangle(SKETCH39_W_2, SKETCH39_H)
    extrude(amount=-DOOR_TEETH_DEPTH, mode=Mode.SUBTRACT)


with BuildPart() as door_teeth_piece_1:
    # of the separate pieces the step leaves, piece 1, a body of its own (door_teeth_pieces)
    add(body_2.part.solids().sort_by_distance((-21.25, 36, 40))[0])


with BuildPart() as door_teeth_piece_2:
    # of the separate pieces the step leaves, piece 2, a body of its own (door_teeth_pieces)
    add(body_2.part.solids().sort_by_distance((26.25, 36, 40))[0])


with BuildPart() as body_4:
    # Sketch45 → spring-back-support (new body)
    with BuildSketch(Plane(origin=(-65, 0, 32.5), x_dir=(-1, 0, 0), z_dir=(0, 0, -1))):
        with Locations((-65, 44)):
            Rectangle(SKETCH45_W, SKETCH45_H)
    spring_back_support = extrude(amount=SPRING_BACK_SUPPORT_DEPTH)

    # spring-back-support-support
    spring_back_support_support_edges = [body_4.edges().sort_by_distance(p)[0] for p in [
        (-24.25, 44, 29.5),
        (24.25, 44, 29.5),
        (0, 48, 29.5),
    ]]
    chamfer(spring_back_support_support_edges, length=SPRING_BACK_SUPPORT_SUPPORT_SIZE - 0.0001)  # a hair under: the kernel refuses the full size


with BuildPart() as part_1:
    add(part.part)

    # spring-placing-ptr: spring-back-support, spring-place ×4 about axis
    spring_placing_ptr_axis = Axis((0, 0, 0), (0, 1, 0))
    add([spring_back_support.rotate(spring_placing_ptr_axis, i * 360 / SPRING_PLACING_PTR_COUNT) for i in range(1, SPRING_PLACING_PTR_COUNT)])
    add([spring_place.rotate(spring_placing_ptr_axis, i * 360 / SPRING_PLACING_PTR_COUNT) for i in range(1, SPRING_PLACING_PTR_COUNT)], mode=Mode.SUBTRACT)

    # spring-back-support-support of spring-pl
    spring_back_support_support_of_spring_pl_edges = [part_1.edges().sort_by_distance(p)[0] for p in [
        (29.5, 44, 24.25),
        (29.5, 44, -24.25),
        (29.5, 48, 0),
        (24.25, 44, -29.5),
        (-24.25, 44, -29.5),
        (0, 48, -29.5),
        (-29.5, 44, -24.25),
        (-29.5, 44, 24.25),
        (-29.5, 48, 0),
    ]]
    chamfer(spring_back_support_support_of_spring_pl_edges, length=SPRING_BACK_SUPPORT_SUPPORT_OF_SPRING_PL_SIZE - 0.0001)  # a hair under: the kernel refuses the full size


solid = Compound([door_teeth_piece_1.part, door_teeth_piece_2.part, body_4.part, part_1.part])
